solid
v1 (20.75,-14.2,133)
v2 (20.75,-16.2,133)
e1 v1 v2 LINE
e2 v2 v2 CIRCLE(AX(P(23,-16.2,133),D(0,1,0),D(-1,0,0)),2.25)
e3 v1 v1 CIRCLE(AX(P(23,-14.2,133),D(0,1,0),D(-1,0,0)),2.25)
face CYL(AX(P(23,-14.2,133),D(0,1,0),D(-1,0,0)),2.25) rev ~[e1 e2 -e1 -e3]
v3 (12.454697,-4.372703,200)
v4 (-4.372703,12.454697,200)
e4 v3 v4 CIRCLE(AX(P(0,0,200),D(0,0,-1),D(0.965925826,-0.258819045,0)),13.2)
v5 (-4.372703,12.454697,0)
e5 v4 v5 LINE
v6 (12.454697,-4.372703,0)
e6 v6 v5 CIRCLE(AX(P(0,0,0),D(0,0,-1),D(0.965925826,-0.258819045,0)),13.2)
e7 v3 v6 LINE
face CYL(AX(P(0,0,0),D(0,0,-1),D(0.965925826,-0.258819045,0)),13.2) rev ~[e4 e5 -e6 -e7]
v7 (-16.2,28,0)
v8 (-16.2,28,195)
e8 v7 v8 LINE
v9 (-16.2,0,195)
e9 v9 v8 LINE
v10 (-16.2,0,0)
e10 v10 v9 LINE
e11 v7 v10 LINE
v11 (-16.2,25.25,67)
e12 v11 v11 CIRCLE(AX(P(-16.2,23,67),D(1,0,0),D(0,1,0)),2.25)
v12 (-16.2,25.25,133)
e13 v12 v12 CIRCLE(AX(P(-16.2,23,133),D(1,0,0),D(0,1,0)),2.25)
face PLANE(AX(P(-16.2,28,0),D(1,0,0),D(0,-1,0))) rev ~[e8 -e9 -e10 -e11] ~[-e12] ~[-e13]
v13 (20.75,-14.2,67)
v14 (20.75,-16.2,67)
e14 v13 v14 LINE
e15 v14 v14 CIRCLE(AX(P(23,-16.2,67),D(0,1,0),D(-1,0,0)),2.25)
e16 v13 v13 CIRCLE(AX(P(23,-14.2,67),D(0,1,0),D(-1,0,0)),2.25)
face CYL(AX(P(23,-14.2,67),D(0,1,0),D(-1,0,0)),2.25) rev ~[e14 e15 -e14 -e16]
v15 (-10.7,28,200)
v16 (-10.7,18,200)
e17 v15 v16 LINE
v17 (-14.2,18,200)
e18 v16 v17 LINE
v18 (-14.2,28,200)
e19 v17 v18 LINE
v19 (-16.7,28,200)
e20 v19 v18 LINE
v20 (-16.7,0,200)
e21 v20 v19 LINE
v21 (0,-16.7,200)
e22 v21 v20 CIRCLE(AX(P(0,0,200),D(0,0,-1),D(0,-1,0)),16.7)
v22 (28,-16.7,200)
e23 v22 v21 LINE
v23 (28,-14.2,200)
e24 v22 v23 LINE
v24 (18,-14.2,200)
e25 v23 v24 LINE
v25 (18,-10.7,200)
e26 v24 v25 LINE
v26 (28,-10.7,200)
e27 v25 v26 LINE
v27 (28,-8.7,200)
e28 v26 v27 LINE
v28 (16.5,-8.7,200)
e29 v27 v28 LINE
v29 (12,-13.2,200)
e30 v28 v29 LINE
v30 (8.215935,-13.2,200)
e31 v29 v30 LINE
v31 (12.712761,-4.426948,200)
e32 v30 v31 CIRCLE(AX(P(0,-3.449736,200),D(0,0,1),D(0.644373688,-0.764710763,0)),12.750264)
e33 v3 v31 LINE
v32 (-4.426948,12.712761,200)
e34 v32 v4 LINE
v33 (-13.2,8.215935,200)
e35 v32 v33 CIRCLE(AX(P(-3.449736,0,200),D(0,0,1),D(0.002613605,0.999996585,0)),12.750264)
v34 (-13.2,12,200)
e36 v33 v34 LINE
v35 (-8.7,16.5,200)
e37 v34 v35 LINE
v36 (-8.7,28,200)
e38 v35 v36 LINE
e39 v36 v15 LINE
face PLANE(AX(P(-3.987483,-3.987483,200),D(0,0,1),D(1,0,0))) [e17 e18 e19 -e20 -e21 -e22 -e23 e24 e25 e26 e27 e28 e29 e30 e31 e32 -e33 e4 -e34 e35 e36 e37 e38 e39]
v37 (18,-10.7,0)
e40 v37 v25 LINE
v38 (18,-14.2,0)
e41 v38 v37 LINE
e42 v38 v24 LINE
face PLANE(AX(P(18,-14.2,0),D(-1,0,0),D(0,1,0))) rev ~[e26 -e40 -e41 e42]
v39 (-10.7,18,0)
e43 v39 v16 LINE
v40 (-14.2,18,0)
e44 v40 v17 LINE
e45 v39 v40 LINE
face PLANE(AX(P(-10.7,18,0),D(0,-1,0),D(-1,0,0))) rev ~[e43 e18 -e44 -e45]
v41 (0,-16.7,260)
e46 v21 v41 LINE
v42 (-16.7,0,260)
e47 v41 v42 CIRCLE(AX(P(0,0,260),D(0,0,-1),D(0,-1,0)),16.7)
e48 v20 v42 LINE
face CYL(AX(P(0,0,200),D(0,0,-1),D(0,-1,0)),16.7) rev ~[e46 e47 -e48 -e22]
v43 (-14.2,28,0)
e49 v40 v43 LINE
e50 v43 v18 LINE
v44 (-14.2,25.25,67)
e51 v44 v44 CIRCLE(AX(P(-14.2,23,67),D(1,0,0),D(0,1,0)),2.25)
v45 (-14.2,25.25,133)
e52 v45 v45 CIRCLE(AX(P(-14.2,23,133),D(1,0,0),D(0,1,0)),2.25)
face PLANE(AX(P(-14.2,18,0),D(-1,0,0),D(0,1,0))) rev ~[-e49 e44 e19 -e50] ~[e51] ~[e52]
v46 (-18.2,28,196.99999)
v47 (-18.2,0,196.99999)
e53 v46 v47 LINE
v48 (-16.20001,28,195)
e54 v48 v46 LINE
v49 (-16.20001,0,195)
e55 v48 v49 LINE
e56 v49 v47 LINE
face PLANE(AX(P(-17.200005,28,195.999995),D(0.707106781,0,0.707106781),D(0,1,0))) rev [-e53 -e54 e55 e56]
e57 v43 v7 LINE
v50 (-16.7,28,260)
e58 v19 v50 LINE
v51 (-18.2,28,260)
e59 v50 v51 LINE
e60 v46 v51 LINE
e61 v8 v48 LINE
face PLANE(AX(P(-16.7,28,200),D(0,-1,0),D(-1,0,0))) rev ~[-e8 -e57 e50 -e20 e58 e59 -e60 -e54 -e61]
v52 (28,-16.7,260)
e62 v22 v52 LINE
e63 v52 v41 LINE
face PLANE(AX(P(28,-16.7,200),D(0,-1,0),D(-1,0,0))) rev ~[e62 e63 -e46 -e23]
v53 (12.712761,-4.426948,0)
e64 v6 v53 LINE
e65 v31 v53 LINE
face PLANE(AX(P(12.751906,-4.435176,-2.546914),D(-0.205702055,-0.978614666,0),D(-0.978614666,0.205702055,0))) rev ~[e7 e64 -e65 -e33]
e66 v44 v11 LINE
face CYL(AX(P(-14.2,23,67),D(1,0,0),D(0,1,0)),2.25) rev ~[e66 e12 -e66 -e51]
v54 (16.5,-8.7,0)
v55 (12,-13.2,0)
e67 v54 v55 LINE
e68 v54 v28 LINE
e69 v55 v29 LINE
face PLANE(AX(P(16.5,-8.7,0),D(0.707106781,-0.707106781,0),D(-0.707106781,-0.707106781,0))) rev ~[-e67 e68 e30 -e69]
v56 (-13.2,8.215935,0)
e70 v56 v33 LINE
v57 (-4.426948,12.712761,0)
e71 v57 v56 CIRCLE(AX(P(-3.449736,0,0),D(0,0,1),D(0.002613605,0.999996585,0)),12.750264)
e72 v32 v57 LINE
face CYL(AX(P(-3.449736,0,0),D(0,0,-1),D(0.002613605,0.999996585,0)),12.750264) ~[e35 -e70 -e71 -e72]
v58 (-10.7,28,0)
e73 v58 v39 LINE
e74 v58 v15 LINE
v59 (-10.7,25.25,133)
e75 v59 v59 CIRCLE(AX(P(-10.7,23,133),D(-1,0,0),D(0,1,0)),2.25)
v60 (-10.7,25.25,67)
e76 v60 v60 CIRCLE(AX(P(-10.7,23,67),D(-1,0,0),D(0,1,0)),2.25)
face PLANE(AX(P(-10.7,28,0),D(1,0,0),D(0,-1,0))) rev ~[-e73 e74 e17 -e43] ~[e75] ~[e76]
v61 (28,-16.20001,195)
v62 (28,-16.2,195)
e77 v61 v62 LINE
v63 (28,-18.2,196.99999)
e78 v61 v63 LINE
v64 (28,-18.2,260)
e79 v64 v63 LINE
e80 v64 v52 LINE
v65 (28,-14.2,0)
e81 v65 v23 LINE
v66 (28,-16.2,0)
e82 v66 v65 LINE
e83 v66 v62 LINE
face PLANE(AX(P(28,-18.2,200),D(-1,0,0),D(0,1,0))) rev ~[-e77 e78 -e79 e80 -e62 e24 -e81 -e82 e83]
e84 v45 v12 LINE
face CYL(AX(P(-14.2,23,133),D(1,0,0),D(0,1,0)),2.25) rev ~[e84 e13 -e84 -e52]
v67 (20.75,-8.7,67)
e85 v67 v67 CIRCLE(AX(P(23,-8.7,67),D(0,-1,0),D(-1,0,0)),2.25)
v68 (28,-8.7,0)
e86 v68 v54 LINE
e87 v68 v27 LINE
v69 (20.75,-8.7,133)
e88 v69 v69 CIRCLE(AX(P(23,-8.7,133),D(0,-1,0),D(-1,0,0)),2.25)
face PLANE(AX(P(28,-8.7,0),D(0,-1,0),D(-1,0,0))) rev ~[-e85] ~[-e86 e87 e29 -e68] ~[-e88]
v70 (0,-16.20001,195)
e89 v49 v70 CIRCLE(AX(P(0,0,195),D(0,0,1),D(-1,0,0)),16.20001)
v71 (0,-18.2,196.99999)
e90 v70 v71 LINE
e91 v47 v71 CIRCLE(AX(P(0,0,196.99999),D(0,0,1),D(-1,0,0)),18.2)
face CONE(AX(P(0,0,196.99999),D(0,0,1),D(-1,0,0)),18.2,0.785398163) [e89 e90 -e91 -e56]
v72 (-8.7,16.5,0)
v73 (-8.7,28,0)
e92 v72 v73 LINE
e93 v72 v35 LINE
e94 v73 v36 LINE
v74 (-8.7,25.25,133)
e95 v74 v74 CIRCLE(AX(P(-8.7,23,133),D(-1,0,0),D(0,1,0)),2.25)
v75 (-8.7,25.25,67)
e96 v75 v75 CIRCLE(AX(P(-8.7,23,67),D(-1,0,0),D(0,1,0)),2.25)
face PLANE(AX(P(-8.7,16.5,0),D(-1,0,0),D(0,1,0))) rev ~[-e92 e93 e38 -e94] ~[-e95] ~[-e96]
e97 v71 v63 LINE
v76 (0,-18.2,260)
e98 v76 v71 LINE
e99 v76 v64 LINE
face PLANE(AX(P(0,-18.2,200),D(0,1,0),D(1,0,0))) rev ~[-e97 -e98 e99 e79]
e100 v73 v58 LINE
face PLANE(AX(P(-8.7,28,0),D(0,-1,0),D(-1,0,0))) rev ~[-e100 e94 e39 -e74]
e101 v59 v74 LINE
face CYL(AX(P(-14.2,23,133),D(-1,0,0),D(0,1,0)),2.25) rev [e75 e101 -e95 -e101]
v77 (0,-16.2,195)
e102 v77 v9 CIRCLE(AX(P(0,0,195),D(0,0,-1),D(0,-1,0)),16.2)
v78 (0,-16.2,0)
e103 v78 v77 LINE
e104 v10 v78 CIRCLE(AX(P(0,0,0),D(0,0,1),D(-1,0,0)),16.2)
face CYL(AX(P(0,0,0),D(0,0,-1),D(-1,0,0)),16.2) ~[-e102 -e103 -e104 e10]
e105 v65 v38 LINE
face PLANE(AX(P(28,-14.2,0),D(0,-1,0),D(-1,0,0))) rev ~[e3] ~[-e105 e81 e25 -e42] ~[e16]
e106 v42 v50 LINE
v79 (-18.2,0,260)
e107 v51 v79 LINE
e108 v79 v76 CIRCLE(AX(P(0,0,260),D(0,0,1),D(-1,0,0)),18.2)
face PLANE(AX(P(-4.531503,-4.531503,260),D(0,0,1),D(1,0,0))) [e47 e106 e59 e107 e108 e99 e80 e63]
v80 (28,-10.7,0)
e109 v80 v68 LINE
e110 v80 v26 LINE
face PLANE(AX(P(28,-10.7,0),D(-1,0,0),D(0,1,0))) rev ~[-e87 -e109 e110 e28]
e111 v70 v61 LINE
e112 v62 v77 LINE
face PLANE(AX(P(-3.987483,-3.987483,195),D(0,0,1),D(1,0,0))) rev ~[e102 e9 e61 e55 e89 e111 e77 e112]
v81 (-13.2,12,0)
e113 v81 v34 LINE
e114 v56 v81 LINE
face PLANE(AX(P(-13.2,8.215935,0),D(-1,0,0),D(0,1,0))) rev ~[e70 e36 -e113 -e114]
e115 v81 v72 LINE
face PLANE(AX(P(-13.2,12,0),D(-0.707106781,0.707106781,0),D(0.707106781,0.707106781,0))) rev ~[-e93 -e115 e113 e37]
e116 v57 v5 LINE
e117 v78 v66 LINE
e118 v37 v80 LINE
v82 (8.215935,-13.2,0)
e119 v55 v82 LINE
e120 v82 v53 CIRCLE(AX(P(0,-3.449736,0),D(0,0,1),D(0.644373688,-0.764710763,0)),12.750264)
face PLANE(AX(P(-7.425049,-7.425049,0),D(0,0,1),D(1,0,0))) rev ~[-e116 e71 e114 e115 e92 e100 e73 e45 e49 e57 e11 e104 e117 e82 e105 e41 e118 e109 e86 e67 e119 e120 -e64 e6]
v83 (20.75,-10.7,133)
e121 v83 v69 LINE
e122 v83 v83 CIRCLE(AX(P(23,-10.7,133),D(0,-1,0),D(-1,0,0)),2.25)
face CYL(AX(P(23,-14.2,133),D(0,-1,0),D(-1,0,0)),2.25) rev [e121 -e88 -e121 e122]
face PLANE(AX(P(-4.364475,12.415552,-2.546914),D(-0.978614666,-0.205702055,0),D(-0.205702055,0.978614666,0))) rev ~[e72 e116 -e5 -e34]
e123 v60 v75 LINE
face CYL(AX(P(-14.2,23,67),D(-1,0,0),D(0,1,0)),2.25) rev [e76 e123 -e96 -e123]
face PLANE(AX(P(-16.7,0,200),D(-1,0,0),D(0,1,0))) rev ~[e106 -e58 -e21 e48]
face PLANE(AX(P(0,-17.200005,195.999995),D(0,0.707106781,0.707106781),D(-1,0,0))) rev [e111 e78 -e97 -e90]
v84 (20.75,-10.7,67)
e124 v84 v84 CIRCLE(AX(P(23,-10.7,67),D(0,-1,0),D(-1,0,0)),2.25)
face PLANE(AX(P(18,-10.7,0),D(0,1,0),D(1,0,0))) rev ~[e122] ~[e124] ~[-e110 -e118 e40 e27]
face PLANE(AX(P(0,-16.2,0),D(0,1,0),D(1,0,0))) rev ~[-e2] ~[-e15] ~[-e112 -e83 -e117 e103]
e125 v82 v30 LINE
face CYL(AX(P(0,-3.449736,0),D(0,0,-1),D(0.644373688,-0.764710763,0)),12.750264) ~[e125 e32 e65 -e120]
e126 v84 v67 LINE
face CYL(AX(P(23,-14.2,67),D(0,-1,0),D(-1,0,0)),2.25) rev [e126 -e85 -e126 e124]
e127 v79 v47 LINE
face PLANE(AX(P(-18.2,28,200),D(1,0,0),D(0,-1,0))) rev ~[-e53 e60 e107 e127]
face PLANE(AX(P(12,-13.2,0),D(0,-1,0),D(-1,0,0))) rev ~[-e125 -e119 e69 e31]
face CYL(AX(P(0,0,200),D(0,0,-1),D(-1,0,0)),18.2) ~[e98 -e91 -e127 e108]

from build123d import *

# Parameters (mm, degrees)
F1_DEPTH       = 200
F2_T1_DEPTH    = 205.0938285461
F4_DEPTH       = 5
F5_SIZE        = 1.99999
F6_DEPTH       = 60
F7_R           = 2.25
F8_DEPTH       = 25
F8_DEPTH_BACK  = 25
F9_R           = 2.25
F10_DEPTH      = 25
F10_DEPTH_BACK = 25


# Not quite as in the source:
# - a fillet or chamfer that OpenCascade refuses, or shapes differently, is made with other operations: its cross-section is extruded or revolved along the edge and cut away or added
# - a fillet or chamfer is up to 0.001 mm smaller than in the source, because OpenCascade refuses the exact size


with BuildPart() as f1:
    # F0 (on Top) → F1 (new body)
    with BuildSketch(Plane.XY):
        with BuildLine():
            ThreePointArc((-13.2, 8.2159349274), (-15.426540085, 4.3732592746), (-16.2, 0))
            ThreePointArc((-16.2, 0), (-11.4551298552, -11.4551298552), (0, -16.2))
            ThreePointArc((0, -16.2), (4.3732592746, -15.426540085), (8.2159349274, -13.2))
            Line((8.2159349274, -13.2), (0, -13.2))
            ThreePointArc((0, -13.2), (-9.3338095117, -9.3338095117), (-13.2, 0))
            Line((-13.2, 0), (-13.2, 8.2159349274))
        make_face()
        with BuildLine():
            Line((-16.2, 12), (-16.2, 0))
            ThreePointArc((-16.2, 0), (-15.426540085, 4.3732592746), (-13.2, 8.2159349274))
            Line((-13.2, 8.2159349274), (-13.2, 12))
            Line((-13.2, 12), (-8.7, 16.5))
            Line((-8.7, 16.5), (-8.7, 28))
            Line((-8.7, 28), (-10.7, 28))
            Line((-10.7, 28), (-10.7, 18))
            Line((-10.7, 18), (-14.2, 18))
            Line((-14.2, 18), (-14.2, 28))
            Line((-14.2, 28), (-16.2, 28))
            Line((-16.2, 28), (-16.2, 12))
        make_face()
        with BuildLine():
            ThreePointArc((8.2159349274, -13.2), (4.3732592746, -15.426540085), (0, -16.2))
            Line((0, -16.2), (12, -16.2))
            Line((12, -16.2), (28, -16.2))
            Line((28, -16.2), (28, -14.2))
            Line((28, -14.2), (18, -14.2))
            Line((18, -14.2), (18, -10.7))
            Line((18, -10.7), (28, -10.7))
            Line((28, -10.7), (28, -8.7))
            Line((28, -8.7), (16.5, -8.7))
            Line((16.5, -8.7), (12, -13.2))
            Line((12, -13.2), (8.2159349274, -13.2))
        make_face()
        with BuildLine():
            ThreePointArc((-3.4164113954, 12.750220907), (-8.8111411033, 11.568257177), (-13.2, 8.2159349274))
            Line((-13.2, 8.2159349274), (-13.2, 0))
            ThreePointArc((-13.2, 0), (-10.4722640918, 8.0356508629), (-3.4164113954, 12.750220907))
        make_face()
        with BuildLine():
            Line((0, -13.2), (8.2159349274, -13.2))
            ThreePointArc((8.2159349274, -13.2), (11.568257177, -8.8111411033), (12.750220907, -3.4164113954))
            ThreePointArc((12.750220907, -3.4164113954), (8.0356508629, -10.4722640918), (0, -13.2))
        make_face()
    extrude(amount=F1_DEPTH)

    # F2: chamfer of 1 on 2 edges, made by hand

    # F2_s2 → F2_t1 (cut)
    with BuildSketch(Plane.XY.offset(-2.546914273)):
        with BuildLine():
            Line((-4.3644750665, 12.4155520043), (-4.4351757111, 12.7519059003))
            Line((-4.4351757111, 12.7519059003), (-4.436708561, 12.7718470731))
            ThreePointArc((-4.436708561, 12.7718470731), (-3.9261784824, 12.7613736088), (-3.4163591233, 12.7702208387))
            Line((-3.4163591233, 12.7702208387), (-3.4112350145, 12.7309023905))
            ThreePointArc((-3.4112350145, 12.7309023905), (-3.893221277, 12.5918715086), (-4.3578497587, 12.3966812519))
            Line((-4.3578497587, 12.3966812519), (-4.3644750665, 12.4155520043))
        make_face()
        with BuildLine():
            Line((12.7519059003, -4.4351757111), (12.4155520043, -4.3644750665))
            Line((12.4155520043, -4.3644750665), (12.3966812519, -4.3578497587))
            ThreePointArc((12.3966812519, -4.3578497587), (12.5918715086, -3.893221277), (12.7309023905, -3.4112350145))
            Line((12.7309023905, -3.4112350145), (12.7702208387, -3.4163591233))
            ThreePointArc((12.7702208387, -3.4163591233), (12.7613736088, -3.9261784824), (12.7718470731, -4.436708561))
            Line((12.7718470731, -4.436708561), (12.7519059003, -4.4351757111))
        make_face()
    extrude(amount=F2_T1_DEPTH, mode=Mode.SUBTRACT)

    # F3 (on face) → F4 (join)
    with BuildSketch(Plane.XY.offset(200)):
        with BuildLine():
            Line((28, -16.7), (28, -16.2))
            Line((28, -16.2), (0, -16.2))
            ThreePointArc((0, -16.2), (-11.4551298552, -11.4551298552), (-16.2, 0))
            Line((-16.2, 0), (-16.2, 28))
            Line((-16.2, 28), (-16.7, 28))
            Line((-16.7, 28), (-16.7, 0))
            ThreePointArc((-16.7, 0), (-11.8086832458, -11.8086832458), (0, -16.7))
            Line((0, -16.7), (28, -16.7))
        make_face()
        with BuildLine():
            Line((28, -18.2), (28, -16.7))
            Line((28, -16.7), (0, -16.7))
            ThreePointArc((0, -16.7), (-11.8086832458, -11.8086832458), (-16.7, 0))
            Line((-16.7, 0), (-16.7, 28))
            Line((-16.7, 28), (-18.2, 28))
            Line((-18.2, 28), (-18.2, 0))
            ThreePointArc((-18.2, 0), (-12.8693434176, -12.8693434176), (0, -18.2))
            Line((0, -18.2), (28, -18.2))
        make_face()
    extrude(amount=-F4_DEPTH)

    # F5 (size 2 in the source; OpenCascade refuses exactly that, so slightly less here)
    f5_edges = [f1.edges().sort_by_distance(p)[0] for p in [
        (-18.2, 14, 195),
        (-12.869343, -12.869343, 195),
        (14, -18.2, 195),
    ]]
    chamfer(f5_edges, length=F5_SIZE)

    # F3 (on face) → F6 (join)
    with BuildSketch(Plane.XY.offset(200)):
        with BuildLine():
            Line((28, -18.2), (28, -16.7))
            Line((28, -16.7), (0, -16.7))
            ThreePointArc((0, -16.7), (-11.8086832458, -11.8086832458), (-16.7, 0))
            Line((-16.7, 0), (-16.7, 28))
            Line((-16.7, 28), (-18.2, 28))
            Line((-18.2, 28), (-18.2, 0))
            ThreePointArc((-18.2, 0), (-12.8693434176, -12.8693434176), (0, -18.2))
            Line((0, -18.2), (28, -18.2))
        make_face()
    extrude(amount=F6_DEPTH)

    # F7 (on face) → F8 (cut, two sides)
    with BuildSketch(Plane(origin=(0, -14.2, 0), x_dir=(-1, 0, 0), z_dir=(0, 1, 0))) as f8_sk:
        with Locations((-23, 133)):
            Circle(F7_R)
        with Locations((-23, 67)):
            Circle(F7_R)
    extrude(amount=-F8_DEPTH, mode=Mode.SUBTRACT)
    extrude(f8_sk.sketch, amount=F8_DEPTH_BACK, mode=Mode.SUBTRACT)

    # F9 (on face) → F10 (cut, two sides)
    with BuildSketch(Plane.YZ.offset(-14.2)) as f10_sk:
        with Locations((23, 133)):
            Circle(F9_R)
        with Locations((23, 67)):
            Circle(F9_R)
    extrude(amount=-F10_DEPTH, mode=Mode.SUBTRACT)
    extrude(f10_sk.sketch, amount=F10_DEPTH_BACK, mode=Mode.SUBTRACT)


solid = f1.part
